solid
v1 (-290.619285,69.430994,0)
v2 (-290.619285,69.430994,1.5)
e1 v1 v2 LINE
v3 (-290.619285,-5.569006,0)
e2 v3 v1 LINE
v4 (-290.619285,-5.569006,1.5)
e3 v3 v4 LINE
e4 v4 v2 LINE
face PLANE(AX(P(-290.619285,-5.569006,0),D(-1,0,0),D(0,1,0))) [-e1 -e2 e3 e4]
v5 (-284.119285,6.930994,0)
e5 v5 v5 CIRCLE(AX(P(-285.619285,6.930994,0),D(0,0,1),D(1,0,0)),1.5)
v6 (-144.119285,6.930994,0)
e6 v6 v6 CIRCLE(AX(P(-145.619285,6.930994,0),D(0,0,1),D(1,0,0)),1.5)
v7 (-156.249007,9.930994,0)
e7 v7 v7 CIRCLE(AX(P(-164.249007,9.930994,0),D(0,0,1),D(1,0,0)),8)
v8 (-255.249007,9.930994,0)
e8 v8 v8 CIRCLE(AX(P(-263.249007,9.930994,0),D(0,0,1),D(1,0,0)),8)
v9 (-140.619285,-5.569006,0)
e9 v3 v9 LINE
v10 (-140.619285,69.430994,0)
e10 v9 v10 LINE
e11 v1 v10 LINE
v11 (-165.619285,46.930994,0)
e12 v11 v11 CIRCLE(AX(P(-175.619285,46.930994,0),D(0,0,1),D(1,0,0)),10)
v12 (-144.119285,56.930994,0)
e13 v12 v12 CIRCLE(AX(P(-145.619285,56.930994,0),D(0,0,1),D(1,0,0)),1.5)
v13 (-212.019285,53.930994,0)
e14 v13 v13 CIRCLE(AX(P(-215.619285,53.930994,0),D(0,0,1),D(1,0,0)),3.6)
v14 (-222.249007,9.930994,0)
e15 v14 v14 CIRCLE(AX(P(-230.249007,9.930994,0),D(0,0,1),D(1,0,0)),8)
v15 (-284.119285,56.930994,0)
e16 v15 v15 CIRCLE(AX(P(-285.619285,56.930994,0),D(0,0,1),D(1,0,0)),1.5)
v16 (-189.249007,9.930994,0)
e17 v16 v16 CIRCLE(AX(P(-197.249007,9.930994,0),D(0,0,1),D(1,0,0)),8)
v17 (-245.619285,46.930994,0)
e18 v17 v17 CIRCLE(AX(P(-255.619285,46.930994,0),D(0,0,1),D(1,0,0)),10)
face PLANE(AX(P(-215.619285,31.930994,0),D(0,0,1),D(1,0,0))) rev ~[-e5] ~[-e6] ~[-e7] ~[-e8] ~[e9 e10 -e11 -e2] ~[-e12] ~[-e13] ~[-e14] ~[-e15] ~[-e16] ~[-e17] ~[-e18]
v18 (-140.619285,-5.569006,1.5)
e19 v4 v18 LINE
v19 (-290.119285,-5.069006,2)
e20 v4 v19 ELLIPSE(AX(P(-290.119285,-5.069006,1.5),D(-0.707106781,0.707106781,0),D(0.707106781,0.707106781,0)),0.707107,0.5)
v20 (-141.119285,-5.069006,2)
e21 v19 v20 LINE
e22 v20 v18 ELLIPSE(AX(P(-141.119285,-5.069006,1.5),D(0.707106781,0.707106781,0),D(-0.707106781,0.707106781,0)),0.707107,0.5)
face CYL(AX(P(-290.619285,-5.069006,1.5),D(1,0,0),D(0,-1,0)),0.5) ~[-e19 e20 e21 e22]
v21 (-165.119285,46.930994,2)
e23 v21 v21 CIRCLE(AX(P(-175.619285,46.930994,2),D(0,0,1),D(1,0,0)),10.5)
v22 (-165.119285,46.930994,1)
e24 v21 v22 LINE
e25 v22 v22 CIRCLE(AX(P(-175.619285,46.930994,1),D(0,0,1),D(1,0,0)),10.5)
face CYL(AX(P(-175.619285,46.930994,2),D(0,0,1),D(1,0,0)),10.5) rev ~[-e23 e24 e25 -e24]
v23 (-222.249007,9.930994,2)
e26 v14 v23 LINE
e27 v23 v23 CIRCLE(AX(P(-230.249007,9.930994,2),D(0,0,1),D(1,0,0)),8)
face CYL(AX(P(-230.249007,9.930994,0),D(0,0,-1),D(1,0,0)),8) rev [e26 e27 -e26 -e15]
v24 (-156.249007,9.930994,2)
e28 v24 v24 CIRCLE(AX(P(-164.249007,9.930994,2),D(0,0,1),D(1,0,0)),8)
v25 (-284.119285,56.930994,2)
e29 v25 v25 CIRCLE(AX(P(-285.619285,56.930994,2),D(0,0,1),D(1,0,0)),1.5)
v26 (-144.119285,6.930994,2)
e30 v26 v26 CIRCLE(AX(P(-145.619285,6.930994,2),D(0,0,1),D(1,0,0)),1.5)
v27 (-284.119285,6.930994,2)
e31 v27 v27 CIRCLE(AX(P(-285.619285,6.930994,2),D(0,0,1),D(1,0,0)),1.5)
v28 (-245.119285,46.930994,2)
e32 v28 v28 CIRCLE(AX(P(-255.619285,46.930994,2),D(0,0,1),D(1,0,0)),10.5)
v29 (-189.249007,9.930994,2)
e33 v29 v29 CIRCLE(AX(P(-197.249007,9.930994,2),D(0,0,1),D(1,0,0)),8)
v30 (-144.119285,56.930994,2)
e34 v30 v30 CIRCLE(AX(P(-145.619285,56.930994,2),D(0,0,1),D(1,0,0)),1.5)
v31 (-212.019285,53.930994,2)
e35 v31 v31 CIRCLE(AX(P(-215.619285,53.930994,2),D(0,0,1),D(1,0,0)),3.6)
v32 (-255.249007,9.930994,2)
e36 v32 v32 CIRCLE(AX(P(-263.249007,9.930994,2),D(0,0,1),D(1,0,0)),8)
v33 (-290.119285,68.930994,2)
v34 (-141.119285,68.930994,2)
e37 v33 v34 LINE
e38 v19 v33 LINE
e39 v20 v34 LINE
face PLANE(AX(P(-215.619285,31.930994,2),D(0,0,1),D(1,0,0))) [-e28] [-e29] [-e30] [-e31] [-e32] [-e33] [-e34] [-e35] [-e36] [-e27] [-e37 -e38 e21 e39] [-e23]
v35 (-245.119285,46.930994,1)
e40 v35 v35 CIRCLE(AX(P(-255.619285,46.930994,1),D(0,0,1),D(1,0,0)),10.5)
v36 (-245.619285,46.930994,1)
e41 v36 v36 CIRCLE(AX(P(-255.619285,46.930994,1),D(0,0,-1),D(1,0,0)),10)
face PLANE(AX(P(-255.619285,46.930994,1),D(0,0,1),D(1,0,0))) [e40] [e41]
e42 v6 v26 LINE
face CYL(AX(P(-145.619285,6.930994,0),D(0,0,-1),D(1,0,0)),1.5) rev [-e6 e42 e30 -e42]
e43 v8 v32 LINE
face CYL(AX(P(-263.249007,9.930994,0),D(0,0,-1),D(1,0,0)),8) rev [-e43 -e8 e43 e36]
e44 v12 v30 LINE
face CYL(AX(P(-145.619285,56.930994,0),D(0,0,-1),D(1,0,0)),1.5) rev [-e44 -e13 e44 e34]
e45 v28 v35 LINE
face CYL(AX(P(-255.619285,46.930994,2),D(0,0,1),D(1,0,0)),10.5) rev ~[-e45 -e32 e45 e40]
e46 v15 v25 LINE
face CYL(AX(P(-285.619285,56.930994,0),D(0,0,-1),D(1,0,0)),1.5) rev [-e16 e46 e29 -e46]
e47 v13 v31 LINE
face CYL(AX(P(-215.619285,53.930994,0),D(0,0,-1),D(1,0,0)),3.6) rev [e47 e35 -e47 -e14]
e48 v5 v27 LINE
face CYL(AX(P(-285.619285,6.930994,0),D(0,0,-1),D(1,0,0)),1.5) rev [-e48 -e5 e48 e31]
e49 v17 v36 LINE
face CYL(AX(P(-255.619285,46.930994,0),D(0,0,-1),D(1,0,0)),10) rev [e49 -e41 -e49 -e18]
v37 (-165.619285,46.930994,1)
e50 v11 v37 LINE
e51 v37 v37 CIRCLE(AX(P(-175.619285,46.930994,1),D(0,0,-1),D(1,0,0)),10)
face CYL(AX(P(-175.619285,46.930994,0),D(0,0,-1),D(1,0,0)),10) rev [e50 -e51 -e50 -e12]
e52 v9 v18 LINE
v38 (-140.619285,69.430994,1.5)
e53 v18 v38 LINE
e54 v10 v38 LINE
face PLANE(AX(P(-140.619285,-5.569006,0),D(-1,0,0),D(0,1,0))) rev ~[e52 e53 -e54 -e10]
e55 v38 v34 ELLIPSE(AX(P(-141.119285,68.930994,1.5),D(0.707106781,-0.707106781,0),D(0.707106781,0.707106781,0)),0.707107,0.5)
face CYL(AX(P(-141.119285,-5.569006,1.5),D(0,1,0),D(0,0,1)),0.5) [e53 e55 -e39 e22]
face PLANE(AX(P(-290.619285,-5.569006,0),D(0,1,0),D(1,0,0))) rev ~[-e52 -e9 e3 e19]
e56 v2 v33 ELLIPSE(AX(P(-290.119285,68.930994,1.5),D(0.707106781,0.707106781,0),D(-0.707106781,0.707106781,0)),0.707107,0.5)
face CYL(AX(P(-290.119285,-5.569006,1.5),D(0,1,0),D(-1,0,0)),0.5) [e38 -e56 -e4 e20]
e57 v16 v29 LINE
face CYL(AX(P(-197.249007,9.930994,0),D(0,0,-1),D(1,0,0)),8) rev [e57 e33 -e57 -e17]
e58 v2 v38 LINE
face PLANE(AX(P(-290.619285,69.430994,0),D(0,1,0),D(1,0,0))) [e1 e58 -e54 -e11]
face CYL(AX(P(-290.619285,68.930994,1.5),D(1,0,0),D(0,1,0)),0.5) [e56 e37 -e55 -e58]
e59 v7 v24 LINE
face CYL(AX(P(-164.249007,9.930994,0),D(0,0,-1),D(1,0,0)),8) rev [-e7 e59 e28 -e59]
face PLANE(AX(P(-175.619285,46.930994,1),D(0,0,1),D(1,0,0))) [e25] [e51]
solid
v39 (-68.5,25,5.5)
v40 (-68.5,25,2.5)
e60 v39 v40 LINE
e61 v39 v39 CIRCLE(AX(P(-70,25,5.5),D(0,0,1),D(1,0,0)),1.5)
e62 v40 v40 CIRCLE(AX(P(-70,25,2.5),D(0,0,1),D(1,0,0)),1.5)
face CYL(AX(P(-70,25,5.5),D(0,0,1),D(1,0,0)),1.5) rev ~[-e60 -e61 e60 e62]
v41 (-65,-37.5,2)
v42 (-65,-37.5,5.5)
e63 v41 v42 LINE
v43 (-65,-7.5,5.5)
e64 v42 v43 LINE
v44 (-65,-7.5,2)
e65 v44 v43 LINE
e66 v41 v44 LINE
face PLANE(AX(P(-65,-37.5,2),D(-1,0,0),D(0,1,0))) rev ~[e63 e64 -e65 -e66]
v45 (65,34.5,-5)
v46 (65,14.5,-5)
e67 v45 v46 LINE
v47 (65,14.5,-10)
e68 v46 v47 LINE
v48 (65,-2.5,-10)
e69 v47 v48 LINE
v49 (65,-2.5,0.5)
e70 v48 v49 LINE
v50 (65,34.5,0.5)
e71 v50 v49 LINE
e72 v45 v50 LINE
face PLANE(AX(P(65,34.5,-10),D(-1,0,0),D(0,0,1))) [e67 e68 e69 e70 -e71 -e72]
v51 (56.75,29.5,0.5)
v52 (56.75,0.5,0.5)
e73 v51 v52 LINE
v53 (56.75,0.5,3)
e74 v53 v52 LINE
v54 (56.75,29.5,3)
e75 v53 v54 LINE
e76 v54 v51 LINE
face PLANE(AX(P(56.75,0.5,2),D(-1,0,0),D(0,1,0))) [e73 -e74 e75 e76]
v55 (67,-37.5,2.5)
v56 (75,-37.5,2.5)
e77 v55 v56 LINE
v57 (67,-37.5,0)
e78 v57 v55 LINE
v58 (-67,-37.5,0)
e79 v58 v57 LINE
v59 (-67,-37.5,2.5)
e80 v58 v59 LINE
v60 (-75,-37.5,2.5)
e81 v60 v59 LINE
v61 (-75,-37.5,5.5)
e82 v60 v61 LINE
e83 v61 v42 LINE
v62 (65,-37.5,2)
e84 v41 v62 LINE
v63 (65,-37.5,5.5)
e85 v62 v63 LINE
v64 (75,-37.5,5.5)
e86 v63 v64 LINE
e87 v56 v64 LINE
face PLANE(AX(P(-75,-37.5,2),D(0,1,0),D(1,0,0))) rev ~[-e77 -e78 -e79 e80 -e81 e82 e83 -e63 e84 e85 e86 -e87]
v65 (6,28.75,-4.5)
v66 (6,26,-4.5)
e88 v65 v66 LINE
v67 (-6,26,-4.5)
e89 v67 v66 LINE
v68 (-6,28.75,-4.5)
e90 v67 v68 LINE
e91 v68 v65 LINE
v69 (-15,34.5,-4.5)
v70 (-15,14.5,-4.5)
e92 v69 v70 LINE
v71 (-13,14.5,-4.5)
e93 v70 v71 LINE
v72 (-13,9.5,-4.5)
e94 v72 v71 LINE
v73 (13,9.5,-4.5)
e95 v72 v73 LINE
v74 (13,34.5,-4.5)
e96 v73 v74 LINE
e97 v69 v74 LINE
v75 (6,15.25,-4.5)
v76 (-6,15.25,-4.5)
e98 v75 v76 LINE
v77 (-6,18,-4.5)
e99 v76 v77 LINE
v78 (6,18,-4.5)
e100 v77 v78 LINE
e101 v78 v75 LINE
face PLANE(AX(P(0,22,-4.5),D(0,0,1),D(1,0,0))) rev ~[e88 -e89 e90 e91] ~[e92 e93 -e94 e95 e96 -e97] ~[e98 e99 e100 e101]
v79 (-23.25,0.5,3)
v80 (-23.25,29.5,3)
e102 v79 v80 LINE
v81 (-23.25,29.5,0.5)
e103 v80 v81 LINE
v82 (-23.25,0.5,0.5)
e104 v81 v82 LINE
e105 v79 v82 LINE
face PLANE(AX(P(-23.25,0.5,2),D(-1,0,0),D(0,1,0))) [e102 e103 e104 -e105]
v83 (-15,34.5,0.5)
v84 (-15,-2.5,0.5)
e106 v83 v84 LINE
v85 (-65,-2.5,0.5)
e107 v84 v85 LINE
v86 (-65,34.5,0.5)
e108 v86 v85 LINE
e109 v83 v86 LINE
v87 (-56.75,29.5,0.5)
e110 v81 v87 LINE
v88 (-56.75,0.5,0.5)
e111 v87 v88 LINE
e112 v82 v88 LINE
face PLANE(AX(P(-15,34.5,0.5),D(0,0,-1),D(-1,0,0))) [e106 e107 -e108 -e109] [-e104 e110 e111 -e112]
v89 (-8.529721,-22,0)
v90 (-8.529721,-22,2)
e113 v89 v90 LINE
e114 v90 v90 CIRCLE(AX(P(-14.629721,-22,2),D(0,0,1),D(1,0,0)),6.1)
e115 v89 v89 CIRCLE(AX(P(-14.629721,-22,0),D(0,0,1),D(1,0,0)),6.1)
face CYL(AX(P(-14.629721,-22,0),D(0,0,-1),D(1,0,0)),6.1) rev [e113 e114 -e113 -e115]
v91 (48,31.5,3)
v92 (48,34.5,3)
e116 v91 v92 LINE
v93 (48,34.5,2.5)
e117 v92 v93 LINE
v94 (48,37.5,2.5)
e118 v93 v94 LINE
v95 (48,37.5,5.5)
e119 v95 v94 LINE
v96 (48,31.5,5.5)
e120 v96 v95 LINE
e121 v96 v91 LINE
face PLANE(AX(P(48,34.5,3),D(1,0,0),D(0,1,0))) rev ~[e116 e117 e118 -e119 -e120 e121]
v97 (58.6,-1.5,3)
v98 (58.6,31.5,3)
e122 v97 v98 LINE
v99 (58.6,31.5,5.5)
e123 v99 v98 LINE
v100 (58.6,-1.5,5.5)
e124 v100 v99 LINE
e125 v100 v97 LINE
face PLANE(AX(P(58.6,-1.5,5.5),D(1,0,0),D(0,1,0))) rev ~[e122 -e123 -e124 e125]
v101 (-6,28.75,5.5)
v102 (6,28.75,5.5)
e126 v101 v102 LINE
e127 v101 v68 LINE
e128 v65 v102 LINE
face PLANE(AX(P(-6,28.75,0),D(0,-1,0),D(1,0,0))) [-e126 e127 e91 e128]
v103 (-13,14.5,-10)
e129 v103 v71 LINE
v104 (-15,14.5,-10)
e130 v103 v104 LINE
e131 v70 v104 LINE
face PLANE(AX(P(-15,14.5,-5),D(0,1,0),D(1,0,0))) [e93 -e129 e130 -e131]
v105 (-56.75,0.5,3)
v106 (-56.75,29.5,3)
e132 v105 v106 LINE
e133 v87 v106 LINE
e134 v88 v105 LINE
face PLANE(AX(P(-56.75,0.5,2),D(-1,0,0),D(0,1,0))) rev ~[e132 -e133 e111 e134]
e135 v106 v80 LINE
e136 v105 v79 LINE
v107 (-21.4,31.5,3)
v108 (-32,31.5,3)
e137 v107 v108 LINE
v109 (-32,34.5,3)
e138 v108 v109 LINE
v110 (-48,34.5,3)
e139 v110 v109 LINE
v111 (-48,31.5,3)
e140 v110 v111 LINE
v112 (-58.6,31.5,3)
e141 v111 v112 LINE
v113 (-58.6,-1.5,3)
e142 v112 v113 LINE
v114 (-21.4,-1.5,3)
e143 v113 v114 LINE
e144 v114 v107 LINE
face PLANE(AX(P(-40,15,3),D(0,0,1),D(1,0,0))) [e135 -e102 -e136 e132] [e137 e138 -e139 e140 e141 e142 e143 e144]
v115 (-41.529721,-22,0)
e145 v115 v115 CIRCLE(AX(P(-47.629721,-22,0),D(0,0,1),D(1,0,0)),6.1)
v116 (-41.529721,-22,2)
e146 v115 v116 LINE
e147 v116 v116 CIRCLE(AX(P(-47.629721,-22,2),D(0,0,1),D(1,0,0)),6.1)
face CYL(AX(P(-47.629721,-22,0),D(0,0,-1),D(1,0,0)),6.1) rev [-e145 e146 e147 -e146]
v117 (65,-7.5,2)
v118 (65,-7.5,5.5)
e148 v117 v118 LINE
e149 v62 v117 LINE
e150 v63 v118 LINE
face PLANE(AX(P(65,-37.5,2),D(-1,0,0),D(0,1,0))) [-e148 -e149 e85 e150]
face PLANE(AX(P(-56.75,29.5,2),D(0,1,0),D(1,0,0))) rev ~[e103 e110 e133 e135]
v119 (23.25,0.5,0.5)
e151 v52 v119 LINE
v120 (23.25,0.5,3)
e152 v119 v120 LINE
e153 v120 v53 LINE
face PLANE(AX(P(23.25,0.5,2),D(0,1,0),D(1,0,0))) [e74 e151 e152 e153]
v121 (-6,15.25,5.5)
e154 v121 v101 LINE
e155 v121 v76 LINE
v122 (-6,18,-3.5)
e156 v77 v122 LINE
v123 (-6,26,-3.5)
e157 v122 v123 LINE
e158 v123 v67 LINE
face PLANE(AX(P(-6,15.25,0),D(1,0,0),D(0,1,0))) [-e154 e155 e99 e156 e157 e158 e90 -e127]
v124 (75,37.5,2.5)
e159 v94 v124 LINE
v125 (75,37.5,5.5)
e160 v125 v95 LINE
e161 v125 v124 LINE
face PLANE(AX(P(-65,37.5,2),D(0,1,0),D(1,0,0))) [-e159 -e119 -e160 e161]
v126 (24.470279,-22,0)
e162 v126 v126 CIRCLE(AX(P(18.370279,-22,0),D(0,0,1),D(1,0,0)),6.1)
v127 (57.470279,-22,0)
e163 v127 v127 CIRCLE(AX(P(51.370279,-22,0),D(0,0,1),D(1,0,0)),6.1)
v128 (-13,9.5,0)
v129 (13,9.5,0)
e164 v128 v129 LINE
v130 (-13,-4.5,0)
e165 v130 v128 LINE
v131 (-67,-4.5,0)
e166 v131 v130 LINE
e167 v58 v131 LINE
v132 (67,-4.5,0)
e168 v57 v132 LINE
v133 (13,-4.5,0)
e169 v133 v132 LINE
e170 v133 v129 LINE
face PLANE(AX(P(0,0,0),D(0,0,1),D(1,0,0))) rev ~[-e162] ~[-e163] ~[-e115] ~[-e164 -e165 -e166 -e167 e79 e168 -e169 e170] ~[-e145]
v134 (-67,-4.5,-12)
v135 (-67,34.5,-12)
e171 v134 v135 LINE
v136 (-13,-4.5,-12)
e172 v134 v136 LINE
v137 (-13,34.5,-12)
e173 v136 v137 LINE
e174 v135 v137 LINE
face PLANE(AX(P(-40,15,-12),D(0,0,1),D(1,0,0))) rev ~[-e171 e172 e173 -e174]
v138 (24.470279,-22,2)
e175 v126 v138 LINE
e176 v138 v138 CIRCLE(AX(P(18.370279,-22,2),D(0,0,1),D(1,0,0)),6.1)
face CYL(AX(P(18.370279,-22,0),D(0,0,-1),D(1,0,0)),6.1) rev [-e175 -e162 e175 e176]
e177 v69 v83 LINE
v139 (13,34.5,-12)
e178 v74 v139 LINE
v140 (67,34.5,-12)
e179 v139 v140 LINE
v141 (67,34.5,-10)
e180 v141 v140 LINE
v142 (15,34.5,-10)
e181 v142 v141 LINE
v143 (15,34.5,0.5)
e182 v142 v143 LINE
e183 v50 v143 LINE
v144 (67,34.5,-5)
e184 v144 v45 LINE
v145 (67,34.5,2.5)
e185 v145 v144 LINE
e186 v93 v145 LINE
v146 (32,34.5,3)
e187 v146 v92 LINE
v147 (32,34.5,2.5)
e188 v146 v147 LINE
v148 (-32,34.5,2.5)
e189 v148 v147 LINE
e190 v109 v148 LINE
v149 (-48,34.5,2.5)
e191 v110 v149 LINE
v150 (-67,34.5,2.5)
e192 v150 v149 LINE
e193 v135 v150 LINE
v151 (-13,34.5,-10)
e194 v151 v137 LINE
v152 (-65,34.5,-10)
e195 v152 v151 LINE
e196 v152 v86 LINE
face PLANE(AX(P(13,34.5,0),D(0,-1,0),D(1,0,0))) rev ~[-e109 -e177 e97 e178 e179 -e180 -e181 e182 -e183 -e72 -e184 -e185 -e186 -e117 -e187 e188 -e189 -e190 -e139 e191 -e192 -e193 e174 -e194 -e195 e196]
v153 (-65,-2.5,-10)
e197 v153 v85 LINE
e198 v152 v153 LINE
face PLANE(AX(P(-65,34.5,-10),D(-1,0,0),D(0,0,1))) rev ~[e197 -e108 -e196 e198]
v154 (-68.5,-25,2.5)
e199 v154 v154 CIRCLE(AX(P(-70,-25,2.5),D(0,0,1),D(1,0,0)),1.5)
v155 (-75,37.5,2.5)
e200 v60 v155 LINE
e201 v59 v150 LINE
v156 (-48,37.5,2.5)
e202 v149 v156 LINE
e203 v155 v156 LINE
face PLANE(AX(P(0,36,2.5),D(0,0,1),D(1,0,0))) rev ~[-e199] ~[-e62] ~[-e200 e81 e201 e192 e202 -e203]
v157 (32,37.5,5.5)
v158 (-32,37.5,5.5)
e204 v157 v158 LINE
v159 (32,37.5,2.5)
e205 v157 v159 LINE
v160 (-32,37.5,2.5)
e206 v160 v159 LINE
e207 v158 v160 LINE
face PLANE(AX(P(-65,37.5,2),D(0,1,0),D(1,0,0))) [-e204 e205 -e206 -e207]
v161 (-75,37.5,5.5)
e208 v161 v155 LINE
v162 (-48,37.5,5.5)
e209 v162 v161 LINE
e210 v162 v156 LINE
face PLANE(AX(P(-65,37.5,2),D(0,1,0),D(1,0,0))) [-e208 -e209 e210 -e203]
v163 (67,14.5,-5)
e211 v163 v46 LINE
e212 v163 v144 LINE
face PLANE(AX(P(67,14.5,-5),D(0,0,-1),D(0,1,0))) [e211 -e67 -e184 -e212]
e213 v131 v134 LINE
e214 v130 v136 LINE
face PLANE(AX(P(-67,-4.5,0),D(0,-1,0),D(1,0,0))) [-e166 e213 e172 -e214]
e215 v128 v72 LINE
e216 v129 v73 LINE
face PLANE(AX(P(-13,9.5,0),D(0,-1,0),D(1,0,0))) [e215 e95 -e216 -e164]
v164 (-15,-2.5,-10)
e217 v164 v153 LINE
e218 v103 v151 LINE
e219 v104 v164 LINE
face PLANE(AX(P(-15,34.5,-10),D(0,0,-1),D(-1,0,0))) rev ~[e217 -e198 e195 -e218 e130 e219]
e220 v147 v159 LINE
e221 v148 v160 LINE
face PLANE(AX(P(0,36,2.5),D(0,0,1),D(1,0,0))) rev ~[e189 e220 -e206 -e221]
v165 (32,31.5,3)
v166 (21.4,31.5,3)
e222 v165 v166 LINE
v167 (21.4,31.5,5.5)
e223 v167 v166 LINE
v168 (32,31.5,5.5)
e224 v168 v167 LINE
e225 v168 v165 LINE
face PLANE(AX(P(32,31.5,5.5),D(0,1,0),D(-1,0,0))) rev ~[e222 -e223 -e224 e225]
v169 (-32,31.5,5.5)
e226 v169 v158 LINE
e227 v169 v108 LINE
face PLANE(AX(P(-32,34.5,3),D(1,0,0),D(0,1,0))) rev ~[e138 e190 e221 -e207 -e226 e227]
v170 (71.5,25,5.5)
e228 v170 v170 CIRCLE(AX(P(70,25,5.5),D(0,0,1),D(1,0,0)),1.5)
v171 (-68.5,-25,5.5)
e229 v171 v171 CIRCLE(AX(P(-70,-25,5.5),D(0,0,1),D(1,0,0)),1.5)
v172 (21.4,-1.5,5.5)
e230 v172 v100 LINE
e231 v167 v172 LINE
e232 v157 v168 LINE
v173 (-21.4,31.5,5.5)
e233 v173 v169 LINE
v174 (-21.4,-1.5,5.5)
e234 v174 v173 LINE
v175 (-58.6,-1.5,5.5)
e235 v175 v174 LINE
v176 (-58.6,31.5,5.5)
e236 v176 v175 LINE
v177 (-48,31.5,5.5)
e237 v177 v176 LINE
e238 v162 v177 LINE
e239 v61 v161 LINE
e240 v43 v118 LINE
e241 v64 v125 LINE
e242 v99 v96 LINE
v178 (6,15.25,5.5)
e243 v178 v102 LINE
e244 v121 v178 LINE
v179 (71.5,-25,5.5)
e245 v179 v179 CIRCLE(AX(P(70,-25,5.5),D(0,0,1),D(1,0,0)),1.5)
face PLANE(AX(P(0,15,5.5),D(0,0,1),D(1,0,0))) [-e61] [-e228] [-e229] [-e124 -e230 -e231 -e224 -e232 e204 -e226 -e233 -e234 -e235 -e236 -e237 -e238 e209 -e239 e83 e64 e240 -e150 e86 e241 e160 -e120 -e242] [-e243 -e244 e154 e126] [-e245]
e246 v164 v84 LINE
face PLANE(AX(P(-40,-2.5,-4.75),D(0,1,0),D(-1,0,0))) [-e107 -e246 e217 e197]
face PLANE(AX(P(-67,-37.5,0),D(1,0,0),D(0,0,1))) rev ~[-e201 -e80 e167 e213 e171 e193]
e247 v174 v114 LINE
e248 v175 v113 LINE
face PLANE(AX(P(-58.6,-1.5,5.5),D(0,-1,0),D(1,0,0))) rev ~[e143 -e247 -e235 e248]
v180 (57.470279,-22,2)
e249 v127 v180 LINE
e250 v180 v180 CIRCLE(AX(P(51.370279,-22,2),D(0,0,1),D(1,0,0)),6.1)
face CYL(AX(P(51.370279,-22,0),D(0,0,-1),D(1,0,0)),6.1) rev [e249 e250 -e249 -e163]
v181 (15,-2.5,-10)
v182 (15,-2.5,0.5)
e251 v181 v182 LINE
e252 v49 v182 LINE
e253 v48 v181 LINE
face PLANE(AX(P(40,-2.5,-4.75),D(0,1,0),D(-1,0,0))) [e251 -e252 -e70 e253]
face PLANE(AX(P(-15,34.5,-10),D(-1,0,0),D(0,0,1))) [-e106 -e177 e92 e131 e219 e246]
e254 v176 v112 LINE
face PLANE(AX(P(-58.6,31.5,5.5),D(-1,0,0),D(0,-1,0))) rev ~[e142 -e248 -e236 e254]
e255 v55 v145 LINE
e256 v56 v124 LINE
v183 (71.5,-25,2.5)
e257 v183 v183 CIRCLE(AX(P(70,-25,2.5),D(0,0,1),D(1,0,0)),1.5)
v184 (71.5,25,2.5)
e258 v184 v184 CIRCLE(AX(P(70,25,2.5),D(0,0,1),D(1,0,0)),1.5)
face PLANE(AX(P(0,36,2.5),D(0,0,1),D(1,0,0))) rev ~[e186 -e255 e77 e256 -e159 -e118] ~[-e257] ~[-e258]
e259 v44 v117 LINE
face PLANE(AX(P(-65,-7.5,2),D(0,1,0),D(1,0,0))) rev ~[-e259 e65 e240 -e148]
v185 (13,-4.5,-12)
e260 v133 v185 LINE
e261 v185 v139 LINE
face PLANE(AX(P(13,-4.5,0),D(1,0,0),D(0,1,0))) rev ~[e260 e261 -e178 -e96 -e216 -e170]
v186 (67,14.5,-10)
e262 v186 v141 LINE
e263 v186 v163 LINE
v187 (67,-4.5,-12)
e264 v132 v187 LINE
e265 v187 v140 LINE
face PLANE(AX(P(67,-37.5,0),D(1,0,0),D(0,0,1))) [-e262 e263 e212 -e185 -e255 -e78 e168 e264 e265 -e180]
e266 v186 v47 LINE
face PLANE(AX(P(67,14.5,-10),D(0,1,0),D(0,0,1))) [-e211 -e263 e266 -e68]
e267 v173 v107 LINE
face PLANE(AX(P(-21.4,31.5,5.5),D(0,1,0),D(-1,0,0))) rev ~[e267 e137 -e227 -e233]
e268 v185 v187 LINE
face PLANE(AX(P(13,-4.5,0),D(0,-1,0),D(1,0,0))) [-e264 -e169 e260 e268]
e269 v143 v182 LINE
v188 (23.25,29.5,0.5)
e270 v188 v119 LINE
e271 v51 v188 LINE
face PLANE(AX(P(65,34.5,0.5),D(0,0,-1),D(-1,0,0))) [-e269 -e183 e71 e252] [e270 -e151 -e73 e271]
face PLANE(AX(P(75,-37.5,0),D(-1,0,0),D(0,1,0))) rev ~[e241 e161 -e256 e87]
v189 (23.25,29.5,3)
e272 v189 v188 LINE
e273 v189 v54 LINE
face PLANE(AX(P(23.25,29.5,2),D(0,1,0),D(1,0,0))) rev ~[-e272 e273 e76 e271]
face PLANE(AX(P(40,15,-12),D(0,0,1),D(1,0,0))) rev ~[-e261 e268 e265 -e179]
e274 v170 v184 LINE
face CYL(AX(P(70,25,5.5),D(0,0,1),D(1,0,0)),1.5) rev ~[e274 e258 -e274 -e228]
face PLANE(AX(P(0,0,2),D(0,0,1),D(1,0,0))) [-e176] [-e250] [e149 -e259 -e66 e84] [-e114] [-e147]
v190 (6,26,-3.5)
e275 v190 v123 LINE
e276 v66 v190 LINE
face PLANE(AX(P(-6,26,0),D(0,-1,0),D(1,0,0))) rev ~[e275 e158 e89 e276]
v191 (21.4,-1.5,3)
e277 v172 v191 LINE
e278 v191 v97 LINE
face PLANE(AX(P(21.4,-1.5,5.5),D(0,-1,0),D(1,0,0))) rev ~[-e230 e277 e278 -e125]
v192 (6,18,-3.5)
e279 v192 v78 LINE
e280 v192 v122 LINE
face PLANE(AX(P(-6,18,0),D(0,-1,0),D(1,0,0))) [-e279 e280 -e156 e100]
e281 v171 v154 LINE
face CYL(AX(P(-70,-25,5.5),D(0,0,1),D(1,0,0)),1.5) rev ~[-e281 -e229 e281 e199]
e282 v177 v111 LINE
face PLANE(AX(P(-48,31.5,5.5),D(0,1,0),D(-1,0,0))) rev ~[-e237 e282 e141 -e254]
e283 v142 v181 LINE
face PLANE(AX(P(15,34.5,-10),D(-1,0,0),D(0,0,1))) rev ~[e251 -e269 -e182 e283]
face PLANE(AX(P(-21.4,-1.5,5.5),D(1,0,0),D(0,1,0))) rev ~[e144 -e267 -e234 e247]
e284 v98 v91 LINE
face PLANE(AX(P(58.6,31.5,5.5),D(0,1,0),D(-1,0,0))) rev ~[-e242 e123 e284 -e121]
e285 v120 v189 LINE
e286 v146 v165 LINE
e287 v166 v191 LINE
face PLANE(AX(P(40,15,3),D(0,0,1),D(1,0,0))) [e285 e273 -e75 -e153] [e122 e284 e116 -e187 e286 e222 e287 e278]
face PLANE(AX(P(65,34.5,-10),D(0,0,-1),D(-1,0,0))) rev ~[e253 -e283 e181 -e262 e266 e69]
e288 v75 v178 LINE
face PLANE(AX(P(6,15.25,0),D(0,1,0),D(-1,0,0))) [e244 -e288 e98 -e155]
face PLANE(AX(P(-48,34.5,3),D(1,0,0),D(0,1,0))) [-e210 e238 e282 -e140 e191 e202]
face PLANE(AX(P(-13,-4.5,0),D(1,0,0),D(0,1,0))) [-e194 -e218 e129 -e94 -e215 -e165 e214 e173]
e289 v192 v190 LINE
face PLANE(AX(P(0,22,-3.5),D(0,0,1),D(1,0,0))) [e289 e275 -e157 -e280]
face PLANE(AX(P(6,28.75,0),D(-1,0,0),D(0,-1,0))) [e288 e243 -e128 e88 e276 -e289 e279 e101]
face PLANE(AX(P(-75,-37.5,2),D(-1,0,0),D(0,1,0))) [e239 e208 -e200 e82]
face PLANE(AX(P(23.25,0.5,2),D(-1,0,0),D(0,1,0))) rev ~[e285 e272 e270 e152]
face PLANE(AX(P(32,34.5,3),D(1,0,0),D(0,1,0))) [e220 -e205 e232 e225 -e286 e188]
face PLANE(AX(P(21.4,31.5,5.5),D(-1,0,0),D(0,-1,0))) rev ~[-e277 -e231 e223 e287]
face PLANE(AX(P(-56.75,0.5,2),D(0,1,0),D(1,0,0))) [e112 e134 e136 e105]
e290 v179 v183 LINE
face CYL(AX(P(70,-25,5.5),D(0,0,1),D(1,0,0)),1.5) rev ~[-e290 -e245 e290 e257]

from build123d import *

# Parameters (mm, degrees)
F0_W      = 150
F0_H      = 75
F0_R      = 1.5
F0_R_2    = 6.1
F0_W_2    = 33.5
F0_H_2    = 29
F0_W_3    = 12
F0_H_3    = 8
F1_DEPTH  = 2
F2_W      = 10
F2_H      = 75
F3_DEPTH  = 3.5
F4_W      = 8
F4_H      = 2.5
F5_DEPTH  = 80
F6_W      = 130
F6_H      = 45
F6_W_2    = 33.5
F6_H_2    = 29
F6_W_3    = 12
F6_H_3    = 13.5
F7_DEPTH  = 3.5
F8_W      = 33.5
F8_H      = 29
F8_W_2    = 16
F8_H_2    = 9
F8_H_3    = 6
F9_DEPTH  = 2.5
F10_W     = 150
F10_H     = 75
F10_R     = 1.5
F10_R_2   = 8
F10_R_3   = 10
F10_R_4   = 3.6
F11_DEPTH = 2
F12_R     = 10.5
F13_DEPTH = 1
F14_W     = 26
F14_H     = 25
F15_DEPTH = 4.5
F16_W     = 12
F16_H     = 13.5
F17_DEPTH = 9
F18_W     = 134
F18_H     = 3
F19_DEPTH = 2.5
F20_W     = 54
F20_H     = 39
F20_W_2   = 33.5
F20_H_2   = 29
F21_DEPTH = 12
F22_W     = 50
F22_H     = 10.5
F23_DEPTH = 37
F24_R     = 1.5
F25_DEPTH = 25
F26_W     = 16
F26_H     = 3
F27_DEPTH = 3
F28_R     = 0.5
F30_W     = 20
F30_H     = 5
F29_W     = 20
F29_H     = 5
F31_DEPTH = 4
F32_W     = 2
F32_H     = 20
F33_DEPTH = 0.5


# Not quite as in the source:
# - a feature names something its author has since deleted; it is built from what else it names


with BuildPart() as f1:
    # F0 (on Top) → F1 (new body)
    with BuildSketch(Plane.XY):
        Rectangle(F0_W, F0_H)
        with Locations((-70, -25)):
            Circle(F0_R, mode=Mode.SUBTRACT)
        with Locations((-47.6297214627, -22)):
            Circle(F0_R_2, mode=Mode.SUBTRACT)
        with Locations((-14.6297214627, -22)):
            Circle(F0_R_2, mode=Mode.SUBTRACT)
        with Locations((18.3702785373, -22)):
            Circle(F0_R_2, mode=Mode.SUBTRACT)
        with Locations((51.3702785373, -22)):
            Circle(F0_R_2, mode=Mode.SUBTRACT)
        with Locations((70, -25)):
            Circle(F0_R, mode=Mode.SUBTRACT)
        with Locations((-40, 15)):
            Rectangle(F0_W_2, F0_H_2, mode=Mode.SUBTRACT)
        with Locations((-70, 25)):
            Circle(F0_R, mode=Mode.SUBTRACT)
        with Locations((40, 15)):
            Rectangle(F0_W_2, F0_H_2, mode=Mode.SUBTRACT)
        Polygon((6, 18), (6, 15.25), (-6, 15.25), (-6, 18), (-6, 26), (-6, 28.75), (6, 28.75), (6, 26), align=None, mode=Mode.SUBTRACT)
        with Locations((70, 25)):
            Circle(F0_R, mode=Mode.SUBTRACT)
        with Locations((0, 22)):
            Rectangle(F0_W_3, F0_H_3)
    extrude(amount=F1_DEPTH)

    # F2 (on face) → F3 (join)
    with BuildSketch(Plane.XY.offset(2)):
        with Locations((-70, 0)):
            Rectangle(F2_W, F2_H)
        with Locations((70, 0)):
            Rectangle(F2_W, F2_H)
    extrude(amount=F3_DEPTH)

    # F4 (on face) → F5 (cut)
    with BuildSketch(Plane.XZ.offset(37.5)):
        with Locations((-71, 1.25)):
            Rectangle(F4_W, F4_H)
        with Locations((71, 1.25)):
            Rectangle(F4_W, F4_H)
    extrude(amount=-F5_DEPTH, mode=Mode.SUBTRACT)

    # F6 (on face) → F7 (join)
    with BuildSketch(Plane.XY.offset(2)):
        with Locations((0, 15)):
            Rectangle(F6_W, F6_H)
        with Locations((-40, 15)):
            Rectangle(F6_W_2, F6_H_2, mode=Mode.SUBTRACT)
        with Locations((0, 22)):
            Rectangle(F6_W_3, F6_H_3, mode=Mode.SUBTRACT)
        with Locations((40, 15)):
            Rectangle(F6_W_2, F6_H_2, mode=Mode.SUBTRACT)
    extrude(amount=F7_DEPTH)

    # F8 (on face) → F9 (cut)
    with BuildSketch(Plane.XY.offset(5.5)):
        Polygon((-58.6, -1.5), (-21.4, -1.5), (-21.4, 31.5), (-32, 31.5), (-48, 31.5), (-58.6, 31.5), align=None)
        with Locations((-40, 15)):
            Rectangle(F8_W, F8_H, mode=Mode.SUBTRACT)
        Polygon((48, 31.5), (32, 31.5), (21.4, 31.5), (21.4, -1.5), (58.6, -1.5), (58.6, 31.5), align=None)
        with Locations((40, 15)):
            Rectangle(F8_W, F8_H, mode=Mode.SUBTRACT)
        with Locations((-40, 42)):
            Rectangle(F8_W_2, F8_H_2)
        with Locations((40, 42)):
            Rectangle(F8_W_2, F8_H_2)
        with Locations((-40, 34.5)):
            Rectangle(F8_W_2, F8_H_3)
        with Locations((40, 34.5)):
            Rectangle(F8_W_2, F8_H_3)
    extrude(amount=-F9_DEPTH, mode=Mode.SUBTRACT)

    # F14 (on face) + F0 (on Top) → F15 (join)
    with BuildSketch(Plane.XY):
        with Locations((0, 22)):
            Rectangle(F14_W, F14_H)
        Polygon((6, 28.75), (6, 26), (6, 18), (6, 15.25), (-6, 15.25), (-6, 18), (-6, 26), (-6, 28.75), align=None, mode=Mode.SUBTRACT)
    with BuildSketch(Plane.XY):
        with Locations((0, 22)):
            Rectangle(F0_W_3, F0_H_3)
    extrude(amount=-F15_DEPTH)

    # F16 (on face) → F17 (cut)
    with BuildSketch(Plane.XY.offset(5.5)):
        with Locations((0, 22)):
            Rectangle(F16_W, F16_H)
    extrude(amount=-F17_DEPTH, mode=Mode.SUBTRACT)

    # F18 (on face) → F19 (cut)
    with BuildSketch(Plane.XY):
        with Locations((0, 36)):
            Rectangle(F18_W, F18_H)
    extrude(amount=F19_DEPTH, mode=Mode.SUBTRACT)

    # F20 (on face) → F21 (join)
    with BuildSketch(Plane.XY):
        with Locations((40, 15)):
            Rectangle(F20_W, F20_H)
        with Locations((40, 15)):
            Rectangle(F20_W_2, F20_H_2, mode=Mode.SUBTRACT)
        with Locations((-40, 15)):
            Rectangle(F20_W, F20_H)
        with Locations((-40, 15)):
            Rectangle(F20_W_2, F20_H_2, mode=Mode.SUBTRACT)
        with Locations((40, 15)):
            Rectangle(F20_W_2, F20_H_2)
        with Locations((-40, 15)):
            Rectangle(F20_W_2, F20_H_2)
    extrude(amount=-F21_DEPTH)

    # F22 (on face) → F23 (cut)
    with BuildSketch(Plane(origin=(0, 34.5, 0), x_dir=(-1, 0, 0), z_dir=(0, 1, 0))):
        with Locations((-40, -4.75)):
            Rectangle(F22_W, F22_H)
        with Locations((40, -4.75)):
            Rectangle(F22_W, F22_H)
    extrude(amount=-F23_DEPTH, mode=Mode.SUBTRACT)

    # F24 (on face) → F25 (cut)
    with BuildSketch(Plane.XY.offset(5.5)):
        with Locations((-70, 25)):
            Circle(F24_R)
        with Locations((-70, -25)):
            Circle(F24_R)
        with Locations((70, 25)):
            Circle(F24_R)
        with Locations((70, -25)):
            Circle(F24_R)
    extrude(amount=-F25_DEPTH, mode=Mode.SUBTRACT)

    # F26 (on face) → F27 (cut)
    with BuildSketch(Plane.XY.offset(3)):
        with Locations((-40, 36)):
            Rectangle(F26_W, F26_H)
        with Locations((40, 36)):
            Rectangle(F26_W, F26_H)
    extrude(amount=-F27_DEPTH, mode=Mode.SUBTRACT)

    # F30 (on face) + F29 (on face) → F31 (cut)
    with BuildSketch(Plane.YZ.offset(67)):
        with Locations((24.5, -7.5)):
            Rectangle(F30_W, F30_H)
    with BuildSketch(Plane.YZ.offset(-13)):
        with Locations((24.5, -7.5)):
            Rectangle(F29_W, F29_H)
    extrude(amount=-F31_DEPTH, mode=Mode.SUBTRACT)

    # F32 (on face) → F33 (cut)
    with BuildSketch(Plane(origin=(0, 0, -5), x_dir=(1, 0, 0), z_dir=(0, 0, -1))):
        with Locations((-14, -24.5)):
            Rectangle(F32_W, F32_H)
    extrude(amount=-F33_DEPTH, mode=Mode.SUBTRACT)


with BuildPart() as f11:
    # F10 (on Top) → F11 (new body)
    with BuildSketch(Plane.XY):
        with Locations((-215.6192851201, 31.9309936473)):
            Rectangle(F10_W, F10_H)
        with Locations((-285.6192851201, 6.9309936473)):
            Circle(F10_R, mode=Mode.SUBTRACT)
        with Locations((-263.2490065828, 9.9309936473)):
            Circle(F10_R_2, mode=Mode.SUBTRACT)
        with Locations((-230.2490065828, 9.9309936473)):
            Circle(F10_R_2, mode=Mode.SUBTRACT)
        with Locations((-197.2490065828, 9.9309936473)):
            Circle(F10_R_2, mode=Mode.SUBTRACT)
        with Locations((-164.2490065828, 9.9309936473)):
            Circle(F10_R_2, mode=Mode.SUBTRACT)
        with Locations((-145.6192851201, 6.9309936473)):
            Circle(F10_R, mode=Mode.SUBTRACT)
        with Locations((-255.6192851201, 46.9309936473)):
            Circle(F10_R_3, mode=Mode.SUBTRACT)
        with Locations((-285.6192851201, 56.9309936473)):
            Circle(F10_R, mode=Mode.SUBTRACT)
        with Locations((-175.6192851201, 46.9309936473)):
            Circle(F10_R_3, mode=Mode.SUBTRACT)
        with Locations((-215.6192851201, 53.9309936473)):
            Circle(F10_R_4, mode=Mode.SUBTRACT)
        with Locations((-145.6192851201, 56.9309936473)):
            Circle(F10_R, mode=Mode.SUBTRACT)
    extrude(amount=F11_DEPTH)

    # F12 (on face) → F13 (cut)
    with BuildSketch(Plane.XY.offset(2)):
        with Locations((-255.6192851201, 46.9309936473)):
            Circle(F12_R)
        with Locations((-175.6192851201, 46.9309936473)):
            Circle(F12_R)
    extrude(amount=-F13_DEPTH, mode=Mode.SUBTRACT)

    # F28
    f28_edges = [f11.edges().sort_by_distance(p)[0] for p in [
        (-290.619285, 31.930994, 2),
        (-215.619285, 69.430994, 2),
        (-140.619285, 31.930994, 2),
        (-215.619285, -5.569006, 2),
    ]]
    fillet(f28_edges, radius=F28_R)


solid = Compound([f1.part, f11.part])
